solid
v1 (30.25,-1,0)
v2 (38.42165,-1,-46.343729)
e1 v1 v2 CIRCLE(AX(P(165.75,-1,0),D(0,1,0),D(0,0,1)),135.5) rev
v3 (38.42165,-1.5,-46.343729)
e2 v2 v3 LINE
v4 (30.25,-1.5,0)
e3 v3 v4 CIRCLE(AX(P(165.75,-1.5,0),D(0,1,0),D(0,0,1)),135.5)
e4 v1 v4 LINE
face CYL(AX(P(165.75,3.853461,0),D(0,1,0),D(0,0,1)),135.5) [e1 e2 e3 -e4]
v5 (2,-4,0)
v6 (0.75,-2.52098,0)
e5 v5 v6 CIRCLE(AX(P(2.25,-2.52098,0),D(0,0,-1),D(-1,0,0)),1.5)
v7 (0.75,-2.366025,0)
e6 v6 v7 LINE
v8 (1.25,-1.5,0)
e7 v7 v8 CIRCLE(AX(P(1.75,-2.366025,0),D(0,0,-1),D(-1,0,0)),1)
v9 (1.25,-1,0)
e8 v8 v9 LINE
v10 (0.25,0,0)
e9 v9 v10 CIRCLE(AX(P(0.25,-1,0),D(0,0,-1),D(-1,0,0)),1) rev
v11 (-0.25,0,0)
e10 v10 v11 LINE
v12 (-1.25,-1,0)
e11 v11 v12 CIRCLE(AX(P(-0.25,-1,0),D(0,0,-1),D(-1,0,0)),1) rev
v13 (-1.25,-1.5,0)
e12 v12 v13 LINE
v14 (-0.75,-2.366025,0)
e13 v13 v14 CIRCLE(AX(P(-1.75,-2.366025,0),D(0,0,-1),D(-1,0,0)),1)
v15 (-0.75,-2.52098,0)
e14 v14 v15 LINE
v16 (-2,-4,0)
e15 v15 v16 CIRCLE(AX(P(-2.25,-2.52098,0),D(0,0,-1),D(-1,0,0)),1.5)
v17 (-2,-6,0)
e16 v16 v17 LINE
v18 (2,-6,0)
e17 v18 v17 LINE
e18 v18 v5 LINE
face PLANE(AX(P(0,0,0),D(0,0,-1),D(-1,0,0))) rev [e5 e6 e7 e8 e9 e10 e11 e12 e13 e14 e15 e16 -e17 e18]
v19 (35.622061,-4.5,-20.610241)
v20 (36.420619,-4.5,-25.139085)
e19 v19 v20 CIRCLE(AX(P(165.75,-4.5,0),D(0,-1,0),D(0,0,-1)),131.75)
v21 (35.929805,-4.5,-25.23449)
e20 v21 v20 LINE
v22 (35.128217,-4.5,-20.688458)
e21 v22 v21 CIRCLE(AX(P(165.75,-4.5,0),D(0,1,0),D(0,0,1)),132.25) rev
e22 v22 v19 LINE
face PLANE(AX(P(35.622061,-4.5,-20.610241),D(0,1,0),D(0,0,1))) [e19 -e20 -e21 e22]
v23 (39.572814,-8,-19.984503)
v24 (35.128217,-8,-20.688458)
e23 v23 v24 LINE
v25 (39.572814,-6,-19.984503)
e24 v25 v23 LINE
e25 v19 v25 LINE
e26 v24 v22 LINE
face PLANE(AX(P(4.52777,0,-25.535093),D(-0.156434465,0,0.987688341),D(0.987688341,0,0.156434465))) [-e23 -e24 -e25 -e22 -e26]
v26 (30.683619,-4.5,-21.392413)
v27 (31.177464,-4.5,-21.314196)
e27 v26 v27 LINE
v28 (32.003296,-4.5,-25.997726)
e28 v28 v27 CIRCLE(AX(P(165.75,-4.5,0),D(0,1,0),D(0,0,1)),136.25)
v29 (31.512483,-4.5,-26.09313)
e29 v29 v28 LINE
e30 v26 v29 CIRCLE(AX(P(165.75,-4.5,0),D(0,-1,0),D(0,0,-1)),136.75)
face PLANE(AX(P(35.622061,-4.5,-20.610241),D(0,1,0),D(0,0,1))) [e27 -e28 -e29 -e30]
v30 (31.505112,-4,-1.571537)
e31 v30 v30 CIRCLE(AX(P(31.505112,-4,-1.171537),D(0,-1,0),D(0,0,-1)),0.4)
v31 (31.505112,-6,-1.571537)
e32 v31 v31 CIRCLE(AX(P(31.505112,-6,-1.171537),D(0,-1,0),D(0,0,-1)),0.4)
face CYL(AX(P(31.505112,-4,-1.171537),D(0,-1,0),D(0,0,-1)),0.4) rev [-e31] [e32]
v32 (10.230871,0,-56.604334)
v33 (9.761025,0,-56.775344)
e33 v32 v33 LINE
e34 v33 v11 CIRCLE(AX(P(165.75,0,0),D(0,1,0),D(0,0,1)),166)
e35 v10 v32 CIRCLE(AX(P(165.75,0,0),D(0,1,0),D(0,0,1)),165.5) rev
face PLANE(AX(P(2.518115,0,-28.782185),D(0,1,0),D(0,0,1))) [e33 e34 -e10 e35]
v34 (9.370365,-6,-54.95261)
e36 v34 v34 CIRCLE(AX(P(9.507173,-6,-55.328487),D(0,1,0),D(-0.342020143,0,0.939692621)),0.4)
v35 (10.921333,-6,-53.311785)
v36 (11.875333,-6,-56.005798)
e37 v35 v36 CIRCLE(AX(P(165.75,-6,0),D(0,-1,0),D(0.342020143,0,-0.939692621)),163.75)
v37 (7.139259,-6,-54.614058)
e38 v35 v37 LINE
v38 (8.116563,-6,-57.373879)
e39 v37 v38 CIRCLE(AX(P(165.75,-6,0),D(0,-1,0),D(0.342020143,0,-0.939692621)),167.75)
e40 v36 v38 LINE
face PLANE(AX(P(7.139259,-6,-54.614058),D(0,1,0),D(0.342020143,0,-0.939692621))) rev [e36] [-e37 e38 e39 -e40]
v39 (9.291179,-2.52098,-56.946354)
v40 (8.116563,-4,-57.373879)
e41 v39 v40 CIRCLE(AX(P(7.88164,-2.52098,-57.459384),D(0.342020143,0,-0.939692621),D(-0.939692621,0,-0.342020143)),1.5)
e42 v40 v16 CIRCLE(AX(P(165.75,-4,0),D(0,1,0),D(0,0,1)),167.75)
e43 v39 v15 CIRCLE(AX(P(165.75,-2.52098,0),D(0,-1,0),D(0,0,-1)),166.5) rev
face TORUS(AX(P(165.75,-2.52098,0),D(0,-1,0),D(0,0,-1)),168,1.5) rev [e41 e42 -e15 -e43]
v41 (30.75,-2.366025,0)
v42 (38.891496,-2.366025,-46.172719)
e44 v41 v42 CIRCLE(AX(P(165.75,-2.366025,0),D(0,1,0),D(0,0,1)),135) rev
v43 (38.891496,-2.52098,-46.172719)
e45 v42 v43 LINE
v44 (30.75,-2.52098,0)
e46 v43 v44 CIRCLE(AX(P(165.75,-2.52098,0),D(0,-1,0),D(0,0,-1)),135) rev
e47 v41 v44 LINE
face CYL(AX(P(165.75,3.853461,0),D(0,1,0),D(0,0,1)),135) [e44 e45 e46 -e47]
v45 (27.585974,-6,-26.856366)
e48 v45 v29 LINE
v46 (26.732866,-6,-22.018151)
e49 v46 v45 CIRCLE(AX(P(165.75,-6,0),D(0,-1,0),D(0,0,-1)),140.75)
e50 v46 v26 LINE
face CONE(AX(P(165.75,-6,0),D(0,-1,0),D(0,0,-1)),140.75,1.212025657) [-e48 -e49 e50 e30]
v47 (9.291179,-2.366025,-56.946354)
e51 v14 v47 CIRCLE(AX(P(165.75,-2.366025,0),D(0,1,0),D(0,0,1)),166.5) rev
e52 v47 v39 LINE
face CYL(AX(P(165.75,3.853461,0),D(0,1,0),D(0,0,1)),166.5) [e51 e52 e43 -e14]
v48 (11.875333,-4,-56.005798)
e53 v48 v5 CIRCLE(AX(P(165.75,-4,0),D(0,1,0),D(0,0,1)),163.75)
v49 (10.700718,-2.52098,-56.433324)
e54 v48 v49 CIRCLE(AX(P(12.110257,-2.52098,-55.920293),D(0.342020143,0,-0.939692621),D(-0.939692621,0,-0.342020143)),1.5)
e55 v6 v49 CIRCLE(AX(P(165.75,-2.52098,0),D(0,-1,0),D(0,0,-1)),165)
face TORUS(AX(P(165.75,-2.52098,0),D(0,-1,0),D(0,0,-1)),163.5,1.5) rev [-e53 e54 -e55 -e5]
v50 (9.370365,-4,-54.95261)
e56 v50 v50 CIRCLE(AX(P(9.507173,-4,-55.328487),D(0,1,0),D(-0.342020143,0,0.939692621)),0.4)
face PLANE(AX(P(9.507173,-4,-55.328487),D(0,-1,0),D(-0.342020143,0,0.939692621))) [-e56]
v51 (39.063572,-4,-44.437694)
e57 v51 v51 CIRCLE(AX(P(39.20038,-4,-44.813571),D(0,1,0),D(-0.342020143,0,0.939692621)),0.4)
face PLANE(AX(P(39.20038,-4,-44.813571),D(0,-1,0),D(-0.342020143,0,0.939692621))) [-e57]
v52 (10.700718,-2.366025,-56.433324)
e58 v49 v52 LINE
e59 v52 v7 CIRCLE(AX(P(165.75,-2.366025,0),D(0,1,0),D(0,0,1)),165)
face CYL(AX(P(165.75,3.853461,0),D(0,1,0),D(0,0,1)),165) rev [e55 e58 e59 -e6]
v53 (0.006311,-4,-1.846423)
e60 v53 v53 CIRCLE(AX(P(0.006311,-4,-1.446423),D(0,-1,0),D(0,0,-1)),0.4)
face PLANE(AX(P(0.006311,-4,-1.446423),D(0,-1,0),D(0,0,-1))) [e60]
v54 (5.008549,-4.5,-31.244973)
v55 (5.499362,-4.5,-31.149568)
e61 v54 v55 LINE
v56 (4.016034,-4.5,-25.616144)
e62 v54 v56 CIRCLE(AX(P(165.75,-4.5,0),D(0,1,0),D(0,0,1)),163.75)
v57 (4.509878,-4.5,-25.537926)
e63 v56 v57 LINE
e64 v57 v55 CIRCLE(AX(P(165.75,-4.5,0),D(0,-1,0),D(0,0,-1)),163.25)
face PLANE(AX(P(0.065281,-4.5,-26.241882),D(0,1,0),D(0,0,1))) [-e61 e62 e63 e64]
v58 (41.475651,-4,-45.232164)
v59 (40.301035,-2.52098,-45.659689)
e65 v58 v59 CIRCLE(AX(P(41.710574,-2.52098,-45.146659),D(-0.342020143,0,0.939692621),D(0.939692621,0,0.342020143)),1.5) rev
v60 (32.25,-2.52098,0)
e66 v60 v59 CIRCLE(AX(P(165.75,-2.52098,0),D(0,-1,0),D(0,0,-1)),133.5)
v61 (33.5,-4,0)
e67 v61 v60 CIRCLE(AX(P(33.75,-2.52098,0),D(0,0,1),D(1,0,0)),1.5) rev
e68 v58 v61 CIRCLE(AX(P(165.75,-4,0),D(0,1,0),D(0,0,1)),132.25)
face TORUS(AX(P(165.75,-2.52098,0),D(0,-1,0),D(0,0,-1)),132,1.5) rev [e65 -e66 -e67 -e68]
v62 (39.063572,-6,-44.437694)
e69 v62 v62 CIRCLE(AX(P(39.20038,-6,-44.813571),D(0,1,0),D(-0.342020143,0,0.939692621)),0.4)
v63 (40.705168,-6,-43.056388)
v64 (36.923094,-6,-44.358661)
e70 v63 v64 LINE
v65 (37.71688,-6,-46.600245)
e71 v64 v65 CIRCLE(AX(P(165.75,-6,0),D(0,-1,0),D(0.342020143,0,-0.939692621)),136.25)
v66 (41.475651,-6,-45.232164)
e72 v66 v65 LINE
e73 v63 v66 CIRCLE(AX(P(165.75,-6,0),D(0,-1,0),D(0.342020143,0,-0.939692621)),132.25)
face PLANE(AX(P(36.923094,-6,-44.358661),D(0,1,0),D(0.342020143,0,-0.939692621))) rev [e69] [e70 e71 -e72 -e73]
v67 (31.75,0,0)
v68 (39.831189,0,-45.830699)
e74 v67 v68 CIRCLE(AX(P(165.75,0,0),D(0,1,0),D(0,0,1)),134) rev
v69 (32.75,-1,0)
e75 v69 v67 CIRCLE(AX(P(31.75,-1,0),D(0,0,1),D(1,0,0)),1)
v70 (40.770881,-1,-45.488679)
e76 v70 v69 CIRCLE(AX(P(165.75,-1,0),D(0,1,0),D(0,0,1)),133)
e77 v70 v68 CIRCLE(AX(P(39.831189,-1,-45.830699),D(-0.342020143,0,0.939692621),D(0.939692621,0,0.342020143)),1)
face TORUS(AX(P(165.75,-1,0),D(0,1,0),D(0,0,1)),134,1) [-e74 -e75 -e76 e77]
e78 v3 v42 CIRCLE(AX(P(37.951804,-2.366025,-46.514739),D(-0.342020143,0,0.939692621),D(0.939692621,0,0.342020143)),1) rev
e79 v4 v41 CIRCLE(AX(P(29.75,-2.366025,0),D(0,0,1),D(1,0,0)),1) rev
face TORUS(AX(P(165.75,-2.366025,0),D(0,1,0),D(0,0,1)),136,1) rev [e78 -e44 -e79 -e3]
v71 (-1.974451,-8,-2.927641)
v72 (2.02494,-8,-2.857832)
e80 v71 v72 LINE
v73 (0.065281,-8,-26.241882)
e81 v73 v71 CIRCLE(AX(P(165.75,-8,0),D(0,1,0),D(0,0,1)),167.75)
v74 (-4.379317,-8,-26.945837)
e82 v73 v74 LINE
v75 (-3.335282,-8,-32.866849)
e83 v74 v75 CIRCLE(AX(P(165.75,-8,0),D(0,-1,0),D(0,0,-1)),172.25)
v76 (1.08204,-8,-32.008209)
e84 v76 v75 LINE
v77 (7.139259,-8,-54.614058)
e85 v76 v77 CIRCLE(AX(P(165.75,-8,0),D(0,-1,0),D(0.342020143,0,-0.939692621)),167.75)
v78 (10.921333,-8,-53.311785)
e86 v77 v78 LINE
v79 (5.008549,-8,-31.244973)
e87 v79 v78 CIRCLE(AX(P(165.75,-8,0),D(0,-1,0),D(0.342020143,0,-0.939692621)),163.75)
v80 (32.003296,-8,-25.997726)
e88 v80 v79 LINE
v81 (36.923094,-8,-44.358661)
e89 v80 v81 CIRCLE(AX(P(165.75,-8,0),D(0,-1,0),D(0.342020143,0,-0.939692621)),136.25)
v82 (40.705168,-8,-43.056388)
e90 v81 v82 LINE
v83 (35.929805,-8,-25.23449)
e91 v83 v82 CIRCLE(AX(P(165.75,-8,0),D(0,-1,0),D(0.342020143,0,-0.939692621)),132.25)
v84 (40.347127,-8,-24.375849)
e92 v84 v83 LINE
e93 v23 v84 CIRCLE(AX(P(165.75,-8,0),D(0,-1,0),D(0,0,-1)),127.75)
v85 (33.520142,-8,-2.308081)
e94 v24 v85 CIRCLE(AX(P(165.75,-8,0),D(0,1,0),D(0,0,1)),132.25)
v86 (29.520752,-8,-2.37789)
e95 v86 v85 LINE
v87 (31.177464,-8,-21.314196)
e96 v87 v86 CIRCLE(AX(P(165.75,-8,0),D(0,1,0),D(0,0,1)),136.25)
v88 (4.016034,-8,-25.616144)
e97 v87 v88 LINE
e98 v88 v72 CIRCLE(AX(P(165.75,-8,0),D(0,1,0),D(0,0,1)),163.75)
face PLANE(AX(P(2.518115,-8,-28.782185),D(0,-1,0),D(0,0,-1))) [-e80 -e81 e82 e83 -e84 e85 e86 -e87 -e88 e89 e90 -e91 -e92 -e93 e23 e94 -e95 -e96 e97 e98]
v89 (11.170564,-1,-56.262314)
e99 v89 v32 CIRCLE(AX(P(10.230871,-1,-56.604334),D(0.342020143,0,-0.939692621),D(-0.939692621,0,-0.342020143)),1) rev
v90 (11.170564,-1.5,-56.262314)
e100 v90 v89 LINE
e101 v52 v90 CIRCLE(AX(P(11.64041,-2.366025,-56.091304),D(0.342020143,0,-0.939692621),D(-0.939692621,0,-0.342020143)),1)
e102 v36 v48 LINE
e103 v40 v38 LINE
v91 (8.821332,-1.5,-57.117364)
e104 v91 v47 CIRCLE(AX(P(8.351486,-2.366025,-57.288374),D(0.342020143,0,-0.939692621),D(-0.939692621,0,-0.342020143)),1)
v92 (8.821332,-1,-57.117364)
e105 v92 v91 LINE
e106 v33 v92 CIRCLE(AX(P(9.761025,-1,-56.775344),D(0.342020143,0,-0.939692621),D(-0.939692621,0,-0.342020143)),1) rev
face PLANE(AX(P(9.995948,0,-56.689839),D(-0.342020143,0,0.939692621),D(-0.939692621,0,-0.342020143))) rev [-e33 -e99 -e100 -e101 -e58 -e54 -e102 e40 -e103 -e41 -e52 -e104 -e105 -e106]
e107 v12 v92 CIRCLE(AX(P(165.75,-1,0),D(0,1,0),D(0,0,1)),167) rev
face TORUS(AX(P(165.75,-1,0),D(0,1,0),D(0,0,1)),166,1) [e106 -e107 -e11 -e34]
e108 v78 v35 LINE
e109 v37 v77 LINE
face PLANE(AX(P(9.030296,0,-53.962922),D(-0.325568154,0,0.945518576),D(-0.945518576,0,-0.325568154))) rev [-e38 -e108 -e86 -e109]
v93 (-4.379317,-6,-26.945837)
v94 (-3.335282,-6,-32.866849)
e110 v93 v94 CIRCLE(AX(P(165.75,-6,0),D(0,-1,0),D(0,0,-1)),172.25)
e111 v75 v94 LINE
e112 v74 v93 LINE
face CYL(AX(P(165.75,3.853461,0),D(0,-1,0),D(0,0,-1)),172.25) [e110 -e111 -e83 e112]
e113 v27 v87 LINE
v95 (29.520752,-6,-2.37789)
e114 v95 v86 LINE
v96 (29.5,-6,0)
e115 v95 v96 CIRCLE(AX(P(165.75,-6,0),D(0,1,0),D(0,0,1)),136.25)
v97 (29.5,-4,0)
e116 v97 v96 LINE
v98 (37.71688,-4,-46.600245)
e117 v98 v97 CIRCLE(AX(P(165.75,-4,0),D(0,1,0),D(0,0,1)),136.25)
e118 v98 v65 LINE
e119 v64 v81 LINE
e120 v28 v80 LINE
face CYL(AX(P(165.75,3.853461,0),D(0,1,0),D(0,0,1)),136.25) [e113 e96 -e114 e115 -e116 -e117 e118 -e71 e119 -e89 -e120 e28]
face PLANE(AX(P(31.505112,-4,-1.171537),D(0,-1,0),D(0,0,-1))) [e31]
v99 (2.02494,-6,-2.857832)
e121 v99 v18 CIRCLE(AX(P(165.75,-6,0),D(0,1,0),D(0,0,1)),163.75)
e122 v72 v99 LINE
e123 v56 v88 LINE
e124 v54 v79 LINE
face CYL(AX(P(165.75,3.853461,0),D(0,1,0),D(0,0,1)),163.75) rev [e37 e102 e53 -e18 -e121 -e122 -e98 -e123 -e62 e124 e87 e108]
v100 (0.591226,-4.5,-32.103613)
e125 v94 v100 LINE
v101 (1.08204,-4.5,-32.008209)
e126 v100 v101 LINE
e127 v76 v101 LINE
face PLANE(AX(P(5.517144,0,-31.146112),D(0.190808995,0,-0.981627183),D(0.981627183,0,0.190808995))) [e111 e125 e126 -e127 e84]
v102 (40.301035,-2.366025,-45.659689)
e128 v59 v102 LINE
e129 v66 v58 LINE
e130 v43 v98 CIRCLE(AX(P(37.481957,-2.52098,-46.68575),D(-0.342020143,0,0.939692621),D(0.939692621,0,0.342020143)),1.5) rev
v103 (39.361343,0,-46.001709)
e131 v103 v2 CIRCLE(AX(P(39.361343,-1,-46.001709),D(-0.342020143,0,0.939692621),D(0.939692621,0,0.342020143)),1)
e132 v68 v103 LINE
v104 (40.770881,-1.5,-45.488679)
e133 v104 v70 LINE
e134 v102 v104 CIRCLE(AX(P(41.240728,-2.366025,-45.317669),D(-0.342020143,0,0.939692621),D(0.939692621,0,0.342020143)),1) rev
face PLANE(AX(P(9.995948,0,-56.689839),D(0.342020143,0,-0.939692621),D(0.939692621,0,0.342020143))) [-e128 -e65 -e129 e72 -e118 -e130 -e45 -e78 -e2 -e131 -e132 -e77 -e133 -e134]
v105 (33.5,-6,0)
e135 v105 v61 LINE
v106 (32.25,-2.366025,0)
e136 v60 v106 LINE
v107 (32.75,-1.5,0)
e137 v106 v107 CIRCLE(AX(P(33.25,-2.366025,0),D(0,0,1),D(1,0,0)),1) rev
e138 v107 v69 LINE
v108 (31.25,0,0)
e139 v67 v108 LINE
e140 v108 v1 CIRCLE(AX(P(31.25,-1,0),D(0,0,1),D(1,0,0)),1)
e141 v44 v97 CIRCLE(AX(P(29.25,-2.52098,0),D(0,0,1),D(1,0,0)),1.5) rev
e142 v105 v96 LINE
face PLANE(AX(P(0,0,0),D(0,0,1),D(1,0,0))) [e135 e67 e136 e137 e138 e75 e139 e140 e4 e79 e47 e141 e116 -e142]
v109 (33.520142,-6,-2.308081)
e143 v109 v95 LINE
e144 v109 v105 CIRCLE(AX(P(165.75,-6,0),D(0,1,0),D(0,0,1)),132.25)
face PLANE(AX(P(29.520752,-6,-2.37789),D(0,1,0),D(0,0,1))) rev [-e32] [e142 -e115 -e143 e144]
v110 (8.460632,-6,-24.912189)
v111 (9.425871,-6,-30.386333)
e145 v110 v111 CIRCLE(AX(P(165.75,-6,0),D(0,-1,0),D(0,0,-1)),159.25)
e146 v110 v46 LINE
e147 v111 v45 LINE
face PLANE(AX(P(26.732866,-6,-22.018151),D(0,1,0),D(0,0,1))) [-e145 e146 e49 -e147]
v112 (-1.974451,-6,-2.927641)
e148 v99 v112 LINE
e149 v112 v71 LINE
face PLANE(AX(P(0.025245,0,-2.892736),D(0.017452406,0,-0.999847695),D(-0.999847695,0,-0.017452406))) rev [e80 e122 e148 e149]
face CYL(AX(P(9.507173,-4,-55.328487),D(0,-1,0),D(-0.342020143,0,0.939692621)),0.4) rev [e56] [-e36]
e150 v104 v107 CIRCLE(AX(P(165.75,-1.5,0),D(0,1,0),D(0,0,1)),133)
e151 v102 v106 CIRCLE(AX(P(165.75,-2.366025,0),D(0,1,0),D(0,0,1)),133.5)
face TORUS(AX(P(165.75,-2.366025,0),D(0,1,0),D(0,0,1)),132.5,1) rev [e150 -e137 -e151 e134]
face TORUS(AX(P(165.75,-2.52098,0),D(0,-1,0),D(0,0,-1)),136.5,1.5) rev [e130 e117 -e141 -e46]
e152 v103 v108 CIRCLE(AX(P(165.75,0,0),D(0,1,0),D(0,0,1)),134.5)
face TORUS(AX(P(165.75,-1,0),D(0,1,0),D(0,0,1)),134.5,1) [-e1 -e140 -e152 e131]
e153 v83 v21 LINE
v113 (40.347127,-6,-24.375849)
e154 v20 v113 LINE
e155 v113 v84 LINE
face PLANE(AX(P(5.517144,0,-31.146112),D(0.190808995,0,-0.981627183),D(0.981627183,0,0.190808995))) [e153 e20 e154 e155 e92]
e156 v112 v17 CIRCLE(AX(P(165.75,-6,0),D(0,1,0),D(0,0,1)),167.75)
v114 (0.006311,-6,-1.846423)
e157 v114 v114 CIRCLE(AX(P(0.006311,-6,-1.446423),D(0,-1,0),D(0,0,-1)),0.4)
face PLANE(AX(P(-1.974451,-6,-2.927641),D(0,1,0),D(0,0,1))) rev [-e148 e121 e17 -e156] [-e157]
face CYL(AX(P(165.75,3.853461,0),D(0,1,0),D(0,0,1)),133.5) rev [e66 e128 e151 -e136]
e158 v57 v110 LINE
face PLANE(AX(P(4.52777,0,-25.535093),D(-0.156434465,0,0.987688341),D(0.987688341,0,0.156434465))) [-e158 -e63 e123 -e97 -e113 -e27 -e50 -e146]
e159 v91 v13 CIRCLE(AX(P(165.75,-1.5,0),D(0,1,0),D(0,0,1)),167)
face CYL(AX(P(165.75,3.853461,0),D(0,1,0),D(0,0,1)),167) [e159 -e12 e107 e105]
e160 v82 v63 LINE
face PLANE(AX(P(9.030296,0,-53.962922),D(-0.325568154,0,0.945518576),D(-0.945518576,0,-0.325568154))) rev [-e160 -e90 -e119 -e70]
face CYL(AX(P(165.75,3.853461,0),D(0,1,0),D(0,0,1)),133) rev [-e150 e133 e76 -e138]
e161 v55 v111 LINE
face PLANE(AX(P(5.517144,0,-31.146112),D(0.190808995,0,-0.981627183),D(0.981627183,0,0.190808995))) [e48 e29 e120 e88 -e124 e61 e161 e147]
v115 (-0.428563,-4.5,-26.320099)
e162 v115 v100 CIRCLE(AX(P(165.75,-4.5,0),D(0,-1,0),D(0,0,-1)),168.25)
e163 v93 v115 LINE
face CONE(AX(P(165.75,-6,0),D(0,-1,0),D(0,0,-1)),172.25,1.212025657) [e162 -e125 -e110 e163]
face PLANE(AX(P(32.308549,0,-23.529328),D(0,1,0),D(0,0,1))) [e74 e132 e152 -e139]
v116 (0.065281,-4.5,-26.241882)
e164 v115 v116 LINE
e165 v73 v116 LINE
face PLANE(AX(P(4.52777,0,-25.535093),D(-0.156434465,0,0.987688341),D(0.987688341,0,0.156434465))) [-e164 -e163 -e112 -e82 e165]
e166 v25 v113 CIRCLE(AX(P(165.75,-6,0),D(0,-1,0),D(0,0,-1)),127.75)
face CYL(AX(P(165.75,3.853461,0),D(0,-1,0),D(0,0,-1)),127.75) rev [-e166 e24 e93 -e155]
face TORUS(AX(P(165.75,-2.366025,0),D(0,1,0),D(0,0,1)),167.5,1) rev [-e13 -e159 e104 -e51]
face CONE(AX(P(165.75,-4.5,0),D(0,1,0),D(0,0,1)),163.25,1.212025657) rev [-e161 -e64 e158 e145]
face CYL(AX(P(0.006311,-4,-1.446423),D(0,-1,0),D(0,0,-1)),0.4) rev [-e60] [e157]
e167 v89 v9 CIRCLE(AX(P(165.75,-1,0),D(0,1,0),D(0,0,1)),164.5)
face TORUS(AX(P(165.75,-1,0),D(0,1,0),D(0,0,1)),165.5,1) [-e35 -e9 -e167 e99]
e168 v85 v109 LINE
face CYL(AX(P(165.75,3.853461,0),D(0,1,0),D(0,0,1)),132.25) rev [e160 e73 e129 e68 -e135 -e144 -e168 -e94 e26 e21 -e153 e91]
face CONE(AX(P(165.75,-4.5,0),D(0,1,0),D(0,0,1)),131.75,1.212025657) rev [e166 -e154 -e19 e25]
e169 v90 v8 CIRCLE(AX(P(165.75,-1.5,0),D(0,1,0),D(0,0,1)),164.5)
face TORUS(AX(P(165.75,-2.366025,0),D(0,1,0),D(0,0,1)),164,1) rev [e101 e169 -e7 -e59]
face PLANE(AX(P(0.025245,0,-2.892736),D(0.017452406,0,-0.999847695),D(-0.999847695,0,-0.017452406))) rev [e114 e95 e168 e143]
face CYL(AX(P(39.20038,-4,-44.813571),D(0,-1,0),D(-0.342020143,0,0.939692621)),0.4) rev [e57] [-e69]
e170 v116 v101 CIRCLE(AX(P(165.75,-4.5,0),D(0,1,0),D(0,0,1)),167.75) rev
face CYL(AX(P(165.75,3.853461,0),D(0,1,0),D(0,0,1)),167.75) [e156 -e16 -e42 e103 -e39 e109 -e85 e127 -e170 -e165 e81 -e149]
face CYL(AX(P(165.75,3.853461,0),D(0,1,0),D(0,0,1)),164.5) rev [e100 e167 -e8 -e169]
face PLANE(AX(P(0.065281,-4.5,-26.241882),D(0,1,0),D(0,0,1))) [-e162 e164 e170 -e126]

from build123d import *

# Parameters (mm, degrees)
REVOLVE_1_ANGLE     = 10
FILLET_1_R          = 1.5
FILLET_2_R          = 1.5
FILLET_3_R          = 1
FILLET_4_R          = 1
SKETCH_7_W          = 4
SKETCH_7_H          = 2
CUT_REVOLVE_1_ANGLE = 1
SKETCH_10_R         = 0.4
CUT_EXTRUDE_1_DEPTH = 2
REVOLVE_2_ANGLE     = 1


with BuildPart() as part:
    # 草图4 → 旋转1 (revolve)
    with BuildSketch(Plane.XY):
        Polygon((0.75, -1.5), (1.25, -1.5), (1.25, 0), (0, 0), (-1.25, 0), (-1.25, -1.5), (-0.75, -1.5), (-0.75, -4), (-2, -4), (-2, -8), (0, -8), (2, -8), (2, -4), (0.75, -4), align=None)
        Polygon((31.5, 0), (32.75, 0), (32.75, -1.5), (32.25, -1.5), (32.25, -4), (33.5, -4), (33.5, -8), (31.5, -8), (29.5, -8), (29.5, -4), (30.75, -4), (30.75, -1.5), (30.25, -1.5), (30.25, 0), align=None)
    revolve(axis=Axis((165.75, 3.853460973, 0), (0, -1, 0)), revolution_arc=REVOLVE_1_ANGLE)

    # 圆角1
    # the kernel refuses this fillet: 1.5 mm, written as the material it adds along each edge
    with BuildSketch(Plane(origin=(165.75, -4, 0), x_dir=(-1, 0, 0), z_dir=(0, 0, 1))) as fillet_1_piece_1:
        with BuildLine():
            CenterArc((163.5, -1.479019946), FILLET_1_R, 0, 80.405931773)
            Line((165, -1.479019946), (165.03, -1.479019946))
            Line((165.03, -1.479019946), (165.03, 0))
            Line((165.03, 0), (165, 0.03))
            ThreePointArc((165, 0.03), (164.375, 0.03), (163.755, 0.029580399))
            Line((163.755, 0.029580399), (163.75, 0))
        make_face()
    revolve(axis=Axis((165.75, -4, 0), (0, -1, 0)), revolution_arc=10)
    with BuildSketch(Plane(origin=(165.75, -4, 0), x_dir=(-1, 0, 0), z_dir=(0, 0, 1))) as fillet_1_piece_2:
        with BuildLine():
            CenterArc((168, -1.479019946), FILLET_1_R, 99.594068227, 80.405931773)
            Line((166.5, -1.479019946), (166.47, -1.479019946))
            Line((166.47, -1.479019946), (166.47, 0))
            Line((166.47, 0), (166.5, 0.03))
            ThreePointArc((166.5, 0.03), (167.125, 0.03), (167.745, 0.029580399))
            Line((167.745, 0.029580399), (167.75, 0))
        make_face()
    revolve(axis=Axis((165.75, -4, 0), (0, -1, 0)), revolution_arc=10)

    # 圆角2
    # the kernel refuses this fillet: 1.5 mm, written as the material it adds along each edge
    with BuildSketch(Plane(origin=(165.75, -4, 0), x_dir=(-1, 0, 0), z_dir=(0, 0, 1))) as fillet_2_piece_1:
        with BuildLine():
            CenterArc((136.5, -1.479019946), FILLET_2_R, 99.594068227, 80.405931773)
            Line((136.25, 0), (136.245, 0.029580399))
            ThreePointArc((136.245, 0.029580399), (135.625, 0.03), (135, 0.03))
            Line((135, 0.03), (134.97, 0))
            Line((134.97, 0), (134.97, -1.479019946))
            Line((134.97, -1.479019946), (135, -1.479019946))
        make_face()
    revolve(axis=Axis((165.75, -4, 0), (0, -1, 0)), revolution_arc=10)
    with BuildSketch(Plane(origin=(165.75, -4, 0), x_dir=(-1, 0, 0), z_dir=(0, 0, 1))) as fillet_2_piece_2:
        with BuildLine():
            CenterArc((132, -1.479019946), FILLET_2_R, 0, 80.405931773)
            Line((133.5, -1.479019946), (133.53, -1.479019946))
            Line((133.53, -1.479019946), (133.53, 0))
            Line((133.53, 0), (133.5, 0.03))
            ThreePointArc((133.5, 0.03), (132.875, 0.03), (132.255, 0.029580399))
            Line((132.255, 0.029580399), (132.25, 0))
        make_face()
    revolve(axis=Axis((165.75, -4, 0), (0, -1, 0)), revolution_arc=10)

    # 圆角3
    # the kernel refuses this fillet: 1 mm, written as the material it adds along each edge
    with BuildSketch(Plane(origin=(165.75, -1.5, 0), x_dir=(-1, 0, 0), z_dir=(0, 0, 1))) as fillet_3_piece_1:
        with BuildLine():
            CenterArc((136, 0.866025404), FILLET_3_R, 180, 60)
            Line((135, 0.866025404), (135, 0))
            Line((135, 0), (135.5, 0))
        make_face()
    revolve(axis=Axis((165.75, -1.5, 0), (0, -1, 0)), revolution_arc=10)
    with BuildSketch(Plane(origin=(165.75, -1.5, 0), x_dir=(-1, 0, 0), z_dir=(0, 0, 1))) as fillet_3_piece_2:
        with BuildLine():
            CenterArc((132.5, 0.866025404), FILLET_3_R, 300, 60)
            Line((133, 0), (133.5, 0))
            Line((133.5, 0), (133.5, 0.866025404))
        make_face()
    revolve(axis=Axis((165.75, -1.5, 0), (0, -1, 0)), revolution_arc=10)
    # the kernel refuses this fillet: 1 mm, written as the material it takes off along each edge
    with BuildSketch(Plane(origin=(165.75, 0, 0), x_dir=(-0.9998233399867428, 0, 0.018795978765534377), z_dir=(0.018795978765534377, 0, 0.9998233399867428))) as fillet_3_2_piece_1:
        with BuildLine():
            CenterArc((133 + FILLET_3_R, FILLET_3_R), FILLET_3_R, 180, 90)
            Line((133, FILLET_3_R), (133, 0))
            Line((133, 0), (133 + FILLET_3_R, 0))
        make_face()
    revolve(axis=Axis((165.75, 0, 0), (0, -1, 0)), revolution_arc=12.153987353, mode=Mode.SUBTRACT)
    with BuildSketch(Plane(origin=(165.75, 0, 0), x_dir=(-0.9998297984864879, 0, 0.01844922921070363), z_dir=(0.01844922921070363, 0, 0.9998297984864879))) as fillet_3_2_piece_2:
        with BuildLine():
            CenterArc((135.5 - FILLET_3_R, FILLET_3_R), FILLET_3_R, 270, 90)
            Line((135.5 - FILLET_3_R, 0), (135.5, 0))
            Line((135.5, 0), (135.5, FILLET_3_R))
        make_face()
    revolve(axis=Axis((165.75, 0, 0), (0, -1, 0)), revolution_arc=12.114245889, mode=Mode.SUBTRACT)

    # 圆角4
    # the kernel refuses this fillet: 1 mm, written as the material it adds along each edge
    with BuildSketch(Plane(origin=(165.75, -1.5, 0), x_dir=(-1, 0, 0), z_dir=(0, 0, 1))) as fillet_4_piece_1:
        with BuildLine():
            CenterArc((167.5, 0.866025404), FILLET_4_R, 180, 60)
            Line((167, 0), (166.5, 0))
            Line((166.5, 0), (166.5, 0.866025404))
        make_face()
    revolve(axis=Axis((165.75, -1.5, 0), (0, -1, 0)), revolution_arc=10)
    with BuildSketch(Plane(origin=(165.75, -1.5, 0), x_dir=(-1, 0, 0), z_dir=(0, 0, 1))) as fillet_4_piece_2:
        with BuildLine():
            CenterArc((164, 0.866025404), FILLET_4_R, 300, 60)
            Line((164.5, 0), (165, 0))
            Line((165, 0), (165, 0.866025404))
        make_face()
    revolve(axis=Axis((165.75, -1.5, 0), (0, -1, 0)), revolution_arc=10)
    # the kernel refuses this fillet: 1 mm, written as the material it takes off along each edge
    with BuildSketch(Plane(origin=(165.75, 0, 0), x_dir=(-0.9998845180351503, 0, 0.015197058715919934), z_dir=(0.015197058715919934, 0, 0.9998845180351503))) as fillet_4_2_piece_1:
        with BuildLine():
            CenterArc((164.5 + FILLET_4_R, FILLET_4_R), FILLET_4_R, 180, 90)
            Line((164.5, FILLET_4_R), (164.5, 0))
            Line((164.5, 0), (164.5 + FILLET_4_R, 0))
        make_face()
    revolve(axis=Axis((165.75, 0, 0), (0, -1, 0)), revolution_arc=11.74152169, mode=Mode.SUBTRACT)
    with BuildSketch(Plane(origin=(165.75, 0, 0), x_dir=(-0.9998879496351009, 0, 0.014969574961036002), z_dir=(0.014969574961036002, 0, 0.9998879496351009))) as fillet_4_2_piece_2:
        with BuildLine():
            CenterArc((167 - FILLET_4_R, FILLET_4_R), FILLET_4_R, 270, 90)
            Line((167 - FILLET_4_R, 0), (167, 0))
            Line((167, 0), (167, FILLET_4_R))
        make_face()
    revolve(axis=Axis((165.75, 0, 0), (0, -1, 0)), revolution_arc=11.715451006, mode=Mode.SUBTRACT)

    # 草图7 → 切除-旋转1 (revolve, cut)
    with BuildSketch(Plane.XY):
        with Locations((0, -7)):
            Rectangle(SKETCH_7_W, SKETCH_7_H)
        with Locations((31.5, -7)):
            Rectangle(SKETCH_7_W, SKETCH_7_H)
    revolve(axis=Axis((165.75, 3.853460973, 0), (0, -1, 0)), revolution_arc=CUT_REVOLVE_1_ANGLE, mode=Mode.SUBTRACT)

    # 草图10 → 切除-拉伸1 (cut)
    with BuildSketch(Plane.XZ.offset(6)):
        with Locations(Location((0.006311252, -1.446423259, 0), (0, 0, 270))):
            Circle(SKETCH_10_R)
        with Locations(Location((31.505111829, -1.171537391, 0), (0, 0, 270))):
            Circle(SKETCH_10_R)
    extrude(amount=-CUT_EXTRUDE_1_DEPTH, mode=Mode.SUBTRACT)

    # 草图11 → 旋转2 (revolve)
    with BuildSketch(Plane(origin=(4.997974052, 0, -28.344919378), x_dir=(-0.9848077530122081, 0, -0.17364817766693072), z_dir=(0.17364817766693072, 0, -0.9848077530122081))):
        Polygon((-26.981885062, -4.5), (-26.481885062, -4.5), (-22.481885062, -6), (-3.981885062, -6), (0.018114938, -4.5), (0.518114938, -4.5), (4.518114938, -4.5), (5.018114938, -4.5), (9.018114938, -6), (9.018114938, -8), (4.518114938, -8), (0.518114938, -8), (-26.981885062, -8), (-30.981885062, -8), (-35.481885062, -8), (-35.481885062, -6), (-31.481885062, -4.5), (-30.981885062, -4.5), align=None)
    revolve(axis=Axis((165.75, 3.853460973, 0), (0, 1, 0)), revolution_arc=REVOLVE_2_ANGLE)

    # 镜向1: part across face


with BuildPart() as part_1:
    add(part.part)
    add(part.part.mirror(Plane(origin=(18.028837048, -5.996688627, -26.04722665), x_dir=(0.9848077529548817, 0, 0.17364817799204443), z_dir=(0.17364817799204443, 0, -0.9848077529548818))))


solid = part_1.part
